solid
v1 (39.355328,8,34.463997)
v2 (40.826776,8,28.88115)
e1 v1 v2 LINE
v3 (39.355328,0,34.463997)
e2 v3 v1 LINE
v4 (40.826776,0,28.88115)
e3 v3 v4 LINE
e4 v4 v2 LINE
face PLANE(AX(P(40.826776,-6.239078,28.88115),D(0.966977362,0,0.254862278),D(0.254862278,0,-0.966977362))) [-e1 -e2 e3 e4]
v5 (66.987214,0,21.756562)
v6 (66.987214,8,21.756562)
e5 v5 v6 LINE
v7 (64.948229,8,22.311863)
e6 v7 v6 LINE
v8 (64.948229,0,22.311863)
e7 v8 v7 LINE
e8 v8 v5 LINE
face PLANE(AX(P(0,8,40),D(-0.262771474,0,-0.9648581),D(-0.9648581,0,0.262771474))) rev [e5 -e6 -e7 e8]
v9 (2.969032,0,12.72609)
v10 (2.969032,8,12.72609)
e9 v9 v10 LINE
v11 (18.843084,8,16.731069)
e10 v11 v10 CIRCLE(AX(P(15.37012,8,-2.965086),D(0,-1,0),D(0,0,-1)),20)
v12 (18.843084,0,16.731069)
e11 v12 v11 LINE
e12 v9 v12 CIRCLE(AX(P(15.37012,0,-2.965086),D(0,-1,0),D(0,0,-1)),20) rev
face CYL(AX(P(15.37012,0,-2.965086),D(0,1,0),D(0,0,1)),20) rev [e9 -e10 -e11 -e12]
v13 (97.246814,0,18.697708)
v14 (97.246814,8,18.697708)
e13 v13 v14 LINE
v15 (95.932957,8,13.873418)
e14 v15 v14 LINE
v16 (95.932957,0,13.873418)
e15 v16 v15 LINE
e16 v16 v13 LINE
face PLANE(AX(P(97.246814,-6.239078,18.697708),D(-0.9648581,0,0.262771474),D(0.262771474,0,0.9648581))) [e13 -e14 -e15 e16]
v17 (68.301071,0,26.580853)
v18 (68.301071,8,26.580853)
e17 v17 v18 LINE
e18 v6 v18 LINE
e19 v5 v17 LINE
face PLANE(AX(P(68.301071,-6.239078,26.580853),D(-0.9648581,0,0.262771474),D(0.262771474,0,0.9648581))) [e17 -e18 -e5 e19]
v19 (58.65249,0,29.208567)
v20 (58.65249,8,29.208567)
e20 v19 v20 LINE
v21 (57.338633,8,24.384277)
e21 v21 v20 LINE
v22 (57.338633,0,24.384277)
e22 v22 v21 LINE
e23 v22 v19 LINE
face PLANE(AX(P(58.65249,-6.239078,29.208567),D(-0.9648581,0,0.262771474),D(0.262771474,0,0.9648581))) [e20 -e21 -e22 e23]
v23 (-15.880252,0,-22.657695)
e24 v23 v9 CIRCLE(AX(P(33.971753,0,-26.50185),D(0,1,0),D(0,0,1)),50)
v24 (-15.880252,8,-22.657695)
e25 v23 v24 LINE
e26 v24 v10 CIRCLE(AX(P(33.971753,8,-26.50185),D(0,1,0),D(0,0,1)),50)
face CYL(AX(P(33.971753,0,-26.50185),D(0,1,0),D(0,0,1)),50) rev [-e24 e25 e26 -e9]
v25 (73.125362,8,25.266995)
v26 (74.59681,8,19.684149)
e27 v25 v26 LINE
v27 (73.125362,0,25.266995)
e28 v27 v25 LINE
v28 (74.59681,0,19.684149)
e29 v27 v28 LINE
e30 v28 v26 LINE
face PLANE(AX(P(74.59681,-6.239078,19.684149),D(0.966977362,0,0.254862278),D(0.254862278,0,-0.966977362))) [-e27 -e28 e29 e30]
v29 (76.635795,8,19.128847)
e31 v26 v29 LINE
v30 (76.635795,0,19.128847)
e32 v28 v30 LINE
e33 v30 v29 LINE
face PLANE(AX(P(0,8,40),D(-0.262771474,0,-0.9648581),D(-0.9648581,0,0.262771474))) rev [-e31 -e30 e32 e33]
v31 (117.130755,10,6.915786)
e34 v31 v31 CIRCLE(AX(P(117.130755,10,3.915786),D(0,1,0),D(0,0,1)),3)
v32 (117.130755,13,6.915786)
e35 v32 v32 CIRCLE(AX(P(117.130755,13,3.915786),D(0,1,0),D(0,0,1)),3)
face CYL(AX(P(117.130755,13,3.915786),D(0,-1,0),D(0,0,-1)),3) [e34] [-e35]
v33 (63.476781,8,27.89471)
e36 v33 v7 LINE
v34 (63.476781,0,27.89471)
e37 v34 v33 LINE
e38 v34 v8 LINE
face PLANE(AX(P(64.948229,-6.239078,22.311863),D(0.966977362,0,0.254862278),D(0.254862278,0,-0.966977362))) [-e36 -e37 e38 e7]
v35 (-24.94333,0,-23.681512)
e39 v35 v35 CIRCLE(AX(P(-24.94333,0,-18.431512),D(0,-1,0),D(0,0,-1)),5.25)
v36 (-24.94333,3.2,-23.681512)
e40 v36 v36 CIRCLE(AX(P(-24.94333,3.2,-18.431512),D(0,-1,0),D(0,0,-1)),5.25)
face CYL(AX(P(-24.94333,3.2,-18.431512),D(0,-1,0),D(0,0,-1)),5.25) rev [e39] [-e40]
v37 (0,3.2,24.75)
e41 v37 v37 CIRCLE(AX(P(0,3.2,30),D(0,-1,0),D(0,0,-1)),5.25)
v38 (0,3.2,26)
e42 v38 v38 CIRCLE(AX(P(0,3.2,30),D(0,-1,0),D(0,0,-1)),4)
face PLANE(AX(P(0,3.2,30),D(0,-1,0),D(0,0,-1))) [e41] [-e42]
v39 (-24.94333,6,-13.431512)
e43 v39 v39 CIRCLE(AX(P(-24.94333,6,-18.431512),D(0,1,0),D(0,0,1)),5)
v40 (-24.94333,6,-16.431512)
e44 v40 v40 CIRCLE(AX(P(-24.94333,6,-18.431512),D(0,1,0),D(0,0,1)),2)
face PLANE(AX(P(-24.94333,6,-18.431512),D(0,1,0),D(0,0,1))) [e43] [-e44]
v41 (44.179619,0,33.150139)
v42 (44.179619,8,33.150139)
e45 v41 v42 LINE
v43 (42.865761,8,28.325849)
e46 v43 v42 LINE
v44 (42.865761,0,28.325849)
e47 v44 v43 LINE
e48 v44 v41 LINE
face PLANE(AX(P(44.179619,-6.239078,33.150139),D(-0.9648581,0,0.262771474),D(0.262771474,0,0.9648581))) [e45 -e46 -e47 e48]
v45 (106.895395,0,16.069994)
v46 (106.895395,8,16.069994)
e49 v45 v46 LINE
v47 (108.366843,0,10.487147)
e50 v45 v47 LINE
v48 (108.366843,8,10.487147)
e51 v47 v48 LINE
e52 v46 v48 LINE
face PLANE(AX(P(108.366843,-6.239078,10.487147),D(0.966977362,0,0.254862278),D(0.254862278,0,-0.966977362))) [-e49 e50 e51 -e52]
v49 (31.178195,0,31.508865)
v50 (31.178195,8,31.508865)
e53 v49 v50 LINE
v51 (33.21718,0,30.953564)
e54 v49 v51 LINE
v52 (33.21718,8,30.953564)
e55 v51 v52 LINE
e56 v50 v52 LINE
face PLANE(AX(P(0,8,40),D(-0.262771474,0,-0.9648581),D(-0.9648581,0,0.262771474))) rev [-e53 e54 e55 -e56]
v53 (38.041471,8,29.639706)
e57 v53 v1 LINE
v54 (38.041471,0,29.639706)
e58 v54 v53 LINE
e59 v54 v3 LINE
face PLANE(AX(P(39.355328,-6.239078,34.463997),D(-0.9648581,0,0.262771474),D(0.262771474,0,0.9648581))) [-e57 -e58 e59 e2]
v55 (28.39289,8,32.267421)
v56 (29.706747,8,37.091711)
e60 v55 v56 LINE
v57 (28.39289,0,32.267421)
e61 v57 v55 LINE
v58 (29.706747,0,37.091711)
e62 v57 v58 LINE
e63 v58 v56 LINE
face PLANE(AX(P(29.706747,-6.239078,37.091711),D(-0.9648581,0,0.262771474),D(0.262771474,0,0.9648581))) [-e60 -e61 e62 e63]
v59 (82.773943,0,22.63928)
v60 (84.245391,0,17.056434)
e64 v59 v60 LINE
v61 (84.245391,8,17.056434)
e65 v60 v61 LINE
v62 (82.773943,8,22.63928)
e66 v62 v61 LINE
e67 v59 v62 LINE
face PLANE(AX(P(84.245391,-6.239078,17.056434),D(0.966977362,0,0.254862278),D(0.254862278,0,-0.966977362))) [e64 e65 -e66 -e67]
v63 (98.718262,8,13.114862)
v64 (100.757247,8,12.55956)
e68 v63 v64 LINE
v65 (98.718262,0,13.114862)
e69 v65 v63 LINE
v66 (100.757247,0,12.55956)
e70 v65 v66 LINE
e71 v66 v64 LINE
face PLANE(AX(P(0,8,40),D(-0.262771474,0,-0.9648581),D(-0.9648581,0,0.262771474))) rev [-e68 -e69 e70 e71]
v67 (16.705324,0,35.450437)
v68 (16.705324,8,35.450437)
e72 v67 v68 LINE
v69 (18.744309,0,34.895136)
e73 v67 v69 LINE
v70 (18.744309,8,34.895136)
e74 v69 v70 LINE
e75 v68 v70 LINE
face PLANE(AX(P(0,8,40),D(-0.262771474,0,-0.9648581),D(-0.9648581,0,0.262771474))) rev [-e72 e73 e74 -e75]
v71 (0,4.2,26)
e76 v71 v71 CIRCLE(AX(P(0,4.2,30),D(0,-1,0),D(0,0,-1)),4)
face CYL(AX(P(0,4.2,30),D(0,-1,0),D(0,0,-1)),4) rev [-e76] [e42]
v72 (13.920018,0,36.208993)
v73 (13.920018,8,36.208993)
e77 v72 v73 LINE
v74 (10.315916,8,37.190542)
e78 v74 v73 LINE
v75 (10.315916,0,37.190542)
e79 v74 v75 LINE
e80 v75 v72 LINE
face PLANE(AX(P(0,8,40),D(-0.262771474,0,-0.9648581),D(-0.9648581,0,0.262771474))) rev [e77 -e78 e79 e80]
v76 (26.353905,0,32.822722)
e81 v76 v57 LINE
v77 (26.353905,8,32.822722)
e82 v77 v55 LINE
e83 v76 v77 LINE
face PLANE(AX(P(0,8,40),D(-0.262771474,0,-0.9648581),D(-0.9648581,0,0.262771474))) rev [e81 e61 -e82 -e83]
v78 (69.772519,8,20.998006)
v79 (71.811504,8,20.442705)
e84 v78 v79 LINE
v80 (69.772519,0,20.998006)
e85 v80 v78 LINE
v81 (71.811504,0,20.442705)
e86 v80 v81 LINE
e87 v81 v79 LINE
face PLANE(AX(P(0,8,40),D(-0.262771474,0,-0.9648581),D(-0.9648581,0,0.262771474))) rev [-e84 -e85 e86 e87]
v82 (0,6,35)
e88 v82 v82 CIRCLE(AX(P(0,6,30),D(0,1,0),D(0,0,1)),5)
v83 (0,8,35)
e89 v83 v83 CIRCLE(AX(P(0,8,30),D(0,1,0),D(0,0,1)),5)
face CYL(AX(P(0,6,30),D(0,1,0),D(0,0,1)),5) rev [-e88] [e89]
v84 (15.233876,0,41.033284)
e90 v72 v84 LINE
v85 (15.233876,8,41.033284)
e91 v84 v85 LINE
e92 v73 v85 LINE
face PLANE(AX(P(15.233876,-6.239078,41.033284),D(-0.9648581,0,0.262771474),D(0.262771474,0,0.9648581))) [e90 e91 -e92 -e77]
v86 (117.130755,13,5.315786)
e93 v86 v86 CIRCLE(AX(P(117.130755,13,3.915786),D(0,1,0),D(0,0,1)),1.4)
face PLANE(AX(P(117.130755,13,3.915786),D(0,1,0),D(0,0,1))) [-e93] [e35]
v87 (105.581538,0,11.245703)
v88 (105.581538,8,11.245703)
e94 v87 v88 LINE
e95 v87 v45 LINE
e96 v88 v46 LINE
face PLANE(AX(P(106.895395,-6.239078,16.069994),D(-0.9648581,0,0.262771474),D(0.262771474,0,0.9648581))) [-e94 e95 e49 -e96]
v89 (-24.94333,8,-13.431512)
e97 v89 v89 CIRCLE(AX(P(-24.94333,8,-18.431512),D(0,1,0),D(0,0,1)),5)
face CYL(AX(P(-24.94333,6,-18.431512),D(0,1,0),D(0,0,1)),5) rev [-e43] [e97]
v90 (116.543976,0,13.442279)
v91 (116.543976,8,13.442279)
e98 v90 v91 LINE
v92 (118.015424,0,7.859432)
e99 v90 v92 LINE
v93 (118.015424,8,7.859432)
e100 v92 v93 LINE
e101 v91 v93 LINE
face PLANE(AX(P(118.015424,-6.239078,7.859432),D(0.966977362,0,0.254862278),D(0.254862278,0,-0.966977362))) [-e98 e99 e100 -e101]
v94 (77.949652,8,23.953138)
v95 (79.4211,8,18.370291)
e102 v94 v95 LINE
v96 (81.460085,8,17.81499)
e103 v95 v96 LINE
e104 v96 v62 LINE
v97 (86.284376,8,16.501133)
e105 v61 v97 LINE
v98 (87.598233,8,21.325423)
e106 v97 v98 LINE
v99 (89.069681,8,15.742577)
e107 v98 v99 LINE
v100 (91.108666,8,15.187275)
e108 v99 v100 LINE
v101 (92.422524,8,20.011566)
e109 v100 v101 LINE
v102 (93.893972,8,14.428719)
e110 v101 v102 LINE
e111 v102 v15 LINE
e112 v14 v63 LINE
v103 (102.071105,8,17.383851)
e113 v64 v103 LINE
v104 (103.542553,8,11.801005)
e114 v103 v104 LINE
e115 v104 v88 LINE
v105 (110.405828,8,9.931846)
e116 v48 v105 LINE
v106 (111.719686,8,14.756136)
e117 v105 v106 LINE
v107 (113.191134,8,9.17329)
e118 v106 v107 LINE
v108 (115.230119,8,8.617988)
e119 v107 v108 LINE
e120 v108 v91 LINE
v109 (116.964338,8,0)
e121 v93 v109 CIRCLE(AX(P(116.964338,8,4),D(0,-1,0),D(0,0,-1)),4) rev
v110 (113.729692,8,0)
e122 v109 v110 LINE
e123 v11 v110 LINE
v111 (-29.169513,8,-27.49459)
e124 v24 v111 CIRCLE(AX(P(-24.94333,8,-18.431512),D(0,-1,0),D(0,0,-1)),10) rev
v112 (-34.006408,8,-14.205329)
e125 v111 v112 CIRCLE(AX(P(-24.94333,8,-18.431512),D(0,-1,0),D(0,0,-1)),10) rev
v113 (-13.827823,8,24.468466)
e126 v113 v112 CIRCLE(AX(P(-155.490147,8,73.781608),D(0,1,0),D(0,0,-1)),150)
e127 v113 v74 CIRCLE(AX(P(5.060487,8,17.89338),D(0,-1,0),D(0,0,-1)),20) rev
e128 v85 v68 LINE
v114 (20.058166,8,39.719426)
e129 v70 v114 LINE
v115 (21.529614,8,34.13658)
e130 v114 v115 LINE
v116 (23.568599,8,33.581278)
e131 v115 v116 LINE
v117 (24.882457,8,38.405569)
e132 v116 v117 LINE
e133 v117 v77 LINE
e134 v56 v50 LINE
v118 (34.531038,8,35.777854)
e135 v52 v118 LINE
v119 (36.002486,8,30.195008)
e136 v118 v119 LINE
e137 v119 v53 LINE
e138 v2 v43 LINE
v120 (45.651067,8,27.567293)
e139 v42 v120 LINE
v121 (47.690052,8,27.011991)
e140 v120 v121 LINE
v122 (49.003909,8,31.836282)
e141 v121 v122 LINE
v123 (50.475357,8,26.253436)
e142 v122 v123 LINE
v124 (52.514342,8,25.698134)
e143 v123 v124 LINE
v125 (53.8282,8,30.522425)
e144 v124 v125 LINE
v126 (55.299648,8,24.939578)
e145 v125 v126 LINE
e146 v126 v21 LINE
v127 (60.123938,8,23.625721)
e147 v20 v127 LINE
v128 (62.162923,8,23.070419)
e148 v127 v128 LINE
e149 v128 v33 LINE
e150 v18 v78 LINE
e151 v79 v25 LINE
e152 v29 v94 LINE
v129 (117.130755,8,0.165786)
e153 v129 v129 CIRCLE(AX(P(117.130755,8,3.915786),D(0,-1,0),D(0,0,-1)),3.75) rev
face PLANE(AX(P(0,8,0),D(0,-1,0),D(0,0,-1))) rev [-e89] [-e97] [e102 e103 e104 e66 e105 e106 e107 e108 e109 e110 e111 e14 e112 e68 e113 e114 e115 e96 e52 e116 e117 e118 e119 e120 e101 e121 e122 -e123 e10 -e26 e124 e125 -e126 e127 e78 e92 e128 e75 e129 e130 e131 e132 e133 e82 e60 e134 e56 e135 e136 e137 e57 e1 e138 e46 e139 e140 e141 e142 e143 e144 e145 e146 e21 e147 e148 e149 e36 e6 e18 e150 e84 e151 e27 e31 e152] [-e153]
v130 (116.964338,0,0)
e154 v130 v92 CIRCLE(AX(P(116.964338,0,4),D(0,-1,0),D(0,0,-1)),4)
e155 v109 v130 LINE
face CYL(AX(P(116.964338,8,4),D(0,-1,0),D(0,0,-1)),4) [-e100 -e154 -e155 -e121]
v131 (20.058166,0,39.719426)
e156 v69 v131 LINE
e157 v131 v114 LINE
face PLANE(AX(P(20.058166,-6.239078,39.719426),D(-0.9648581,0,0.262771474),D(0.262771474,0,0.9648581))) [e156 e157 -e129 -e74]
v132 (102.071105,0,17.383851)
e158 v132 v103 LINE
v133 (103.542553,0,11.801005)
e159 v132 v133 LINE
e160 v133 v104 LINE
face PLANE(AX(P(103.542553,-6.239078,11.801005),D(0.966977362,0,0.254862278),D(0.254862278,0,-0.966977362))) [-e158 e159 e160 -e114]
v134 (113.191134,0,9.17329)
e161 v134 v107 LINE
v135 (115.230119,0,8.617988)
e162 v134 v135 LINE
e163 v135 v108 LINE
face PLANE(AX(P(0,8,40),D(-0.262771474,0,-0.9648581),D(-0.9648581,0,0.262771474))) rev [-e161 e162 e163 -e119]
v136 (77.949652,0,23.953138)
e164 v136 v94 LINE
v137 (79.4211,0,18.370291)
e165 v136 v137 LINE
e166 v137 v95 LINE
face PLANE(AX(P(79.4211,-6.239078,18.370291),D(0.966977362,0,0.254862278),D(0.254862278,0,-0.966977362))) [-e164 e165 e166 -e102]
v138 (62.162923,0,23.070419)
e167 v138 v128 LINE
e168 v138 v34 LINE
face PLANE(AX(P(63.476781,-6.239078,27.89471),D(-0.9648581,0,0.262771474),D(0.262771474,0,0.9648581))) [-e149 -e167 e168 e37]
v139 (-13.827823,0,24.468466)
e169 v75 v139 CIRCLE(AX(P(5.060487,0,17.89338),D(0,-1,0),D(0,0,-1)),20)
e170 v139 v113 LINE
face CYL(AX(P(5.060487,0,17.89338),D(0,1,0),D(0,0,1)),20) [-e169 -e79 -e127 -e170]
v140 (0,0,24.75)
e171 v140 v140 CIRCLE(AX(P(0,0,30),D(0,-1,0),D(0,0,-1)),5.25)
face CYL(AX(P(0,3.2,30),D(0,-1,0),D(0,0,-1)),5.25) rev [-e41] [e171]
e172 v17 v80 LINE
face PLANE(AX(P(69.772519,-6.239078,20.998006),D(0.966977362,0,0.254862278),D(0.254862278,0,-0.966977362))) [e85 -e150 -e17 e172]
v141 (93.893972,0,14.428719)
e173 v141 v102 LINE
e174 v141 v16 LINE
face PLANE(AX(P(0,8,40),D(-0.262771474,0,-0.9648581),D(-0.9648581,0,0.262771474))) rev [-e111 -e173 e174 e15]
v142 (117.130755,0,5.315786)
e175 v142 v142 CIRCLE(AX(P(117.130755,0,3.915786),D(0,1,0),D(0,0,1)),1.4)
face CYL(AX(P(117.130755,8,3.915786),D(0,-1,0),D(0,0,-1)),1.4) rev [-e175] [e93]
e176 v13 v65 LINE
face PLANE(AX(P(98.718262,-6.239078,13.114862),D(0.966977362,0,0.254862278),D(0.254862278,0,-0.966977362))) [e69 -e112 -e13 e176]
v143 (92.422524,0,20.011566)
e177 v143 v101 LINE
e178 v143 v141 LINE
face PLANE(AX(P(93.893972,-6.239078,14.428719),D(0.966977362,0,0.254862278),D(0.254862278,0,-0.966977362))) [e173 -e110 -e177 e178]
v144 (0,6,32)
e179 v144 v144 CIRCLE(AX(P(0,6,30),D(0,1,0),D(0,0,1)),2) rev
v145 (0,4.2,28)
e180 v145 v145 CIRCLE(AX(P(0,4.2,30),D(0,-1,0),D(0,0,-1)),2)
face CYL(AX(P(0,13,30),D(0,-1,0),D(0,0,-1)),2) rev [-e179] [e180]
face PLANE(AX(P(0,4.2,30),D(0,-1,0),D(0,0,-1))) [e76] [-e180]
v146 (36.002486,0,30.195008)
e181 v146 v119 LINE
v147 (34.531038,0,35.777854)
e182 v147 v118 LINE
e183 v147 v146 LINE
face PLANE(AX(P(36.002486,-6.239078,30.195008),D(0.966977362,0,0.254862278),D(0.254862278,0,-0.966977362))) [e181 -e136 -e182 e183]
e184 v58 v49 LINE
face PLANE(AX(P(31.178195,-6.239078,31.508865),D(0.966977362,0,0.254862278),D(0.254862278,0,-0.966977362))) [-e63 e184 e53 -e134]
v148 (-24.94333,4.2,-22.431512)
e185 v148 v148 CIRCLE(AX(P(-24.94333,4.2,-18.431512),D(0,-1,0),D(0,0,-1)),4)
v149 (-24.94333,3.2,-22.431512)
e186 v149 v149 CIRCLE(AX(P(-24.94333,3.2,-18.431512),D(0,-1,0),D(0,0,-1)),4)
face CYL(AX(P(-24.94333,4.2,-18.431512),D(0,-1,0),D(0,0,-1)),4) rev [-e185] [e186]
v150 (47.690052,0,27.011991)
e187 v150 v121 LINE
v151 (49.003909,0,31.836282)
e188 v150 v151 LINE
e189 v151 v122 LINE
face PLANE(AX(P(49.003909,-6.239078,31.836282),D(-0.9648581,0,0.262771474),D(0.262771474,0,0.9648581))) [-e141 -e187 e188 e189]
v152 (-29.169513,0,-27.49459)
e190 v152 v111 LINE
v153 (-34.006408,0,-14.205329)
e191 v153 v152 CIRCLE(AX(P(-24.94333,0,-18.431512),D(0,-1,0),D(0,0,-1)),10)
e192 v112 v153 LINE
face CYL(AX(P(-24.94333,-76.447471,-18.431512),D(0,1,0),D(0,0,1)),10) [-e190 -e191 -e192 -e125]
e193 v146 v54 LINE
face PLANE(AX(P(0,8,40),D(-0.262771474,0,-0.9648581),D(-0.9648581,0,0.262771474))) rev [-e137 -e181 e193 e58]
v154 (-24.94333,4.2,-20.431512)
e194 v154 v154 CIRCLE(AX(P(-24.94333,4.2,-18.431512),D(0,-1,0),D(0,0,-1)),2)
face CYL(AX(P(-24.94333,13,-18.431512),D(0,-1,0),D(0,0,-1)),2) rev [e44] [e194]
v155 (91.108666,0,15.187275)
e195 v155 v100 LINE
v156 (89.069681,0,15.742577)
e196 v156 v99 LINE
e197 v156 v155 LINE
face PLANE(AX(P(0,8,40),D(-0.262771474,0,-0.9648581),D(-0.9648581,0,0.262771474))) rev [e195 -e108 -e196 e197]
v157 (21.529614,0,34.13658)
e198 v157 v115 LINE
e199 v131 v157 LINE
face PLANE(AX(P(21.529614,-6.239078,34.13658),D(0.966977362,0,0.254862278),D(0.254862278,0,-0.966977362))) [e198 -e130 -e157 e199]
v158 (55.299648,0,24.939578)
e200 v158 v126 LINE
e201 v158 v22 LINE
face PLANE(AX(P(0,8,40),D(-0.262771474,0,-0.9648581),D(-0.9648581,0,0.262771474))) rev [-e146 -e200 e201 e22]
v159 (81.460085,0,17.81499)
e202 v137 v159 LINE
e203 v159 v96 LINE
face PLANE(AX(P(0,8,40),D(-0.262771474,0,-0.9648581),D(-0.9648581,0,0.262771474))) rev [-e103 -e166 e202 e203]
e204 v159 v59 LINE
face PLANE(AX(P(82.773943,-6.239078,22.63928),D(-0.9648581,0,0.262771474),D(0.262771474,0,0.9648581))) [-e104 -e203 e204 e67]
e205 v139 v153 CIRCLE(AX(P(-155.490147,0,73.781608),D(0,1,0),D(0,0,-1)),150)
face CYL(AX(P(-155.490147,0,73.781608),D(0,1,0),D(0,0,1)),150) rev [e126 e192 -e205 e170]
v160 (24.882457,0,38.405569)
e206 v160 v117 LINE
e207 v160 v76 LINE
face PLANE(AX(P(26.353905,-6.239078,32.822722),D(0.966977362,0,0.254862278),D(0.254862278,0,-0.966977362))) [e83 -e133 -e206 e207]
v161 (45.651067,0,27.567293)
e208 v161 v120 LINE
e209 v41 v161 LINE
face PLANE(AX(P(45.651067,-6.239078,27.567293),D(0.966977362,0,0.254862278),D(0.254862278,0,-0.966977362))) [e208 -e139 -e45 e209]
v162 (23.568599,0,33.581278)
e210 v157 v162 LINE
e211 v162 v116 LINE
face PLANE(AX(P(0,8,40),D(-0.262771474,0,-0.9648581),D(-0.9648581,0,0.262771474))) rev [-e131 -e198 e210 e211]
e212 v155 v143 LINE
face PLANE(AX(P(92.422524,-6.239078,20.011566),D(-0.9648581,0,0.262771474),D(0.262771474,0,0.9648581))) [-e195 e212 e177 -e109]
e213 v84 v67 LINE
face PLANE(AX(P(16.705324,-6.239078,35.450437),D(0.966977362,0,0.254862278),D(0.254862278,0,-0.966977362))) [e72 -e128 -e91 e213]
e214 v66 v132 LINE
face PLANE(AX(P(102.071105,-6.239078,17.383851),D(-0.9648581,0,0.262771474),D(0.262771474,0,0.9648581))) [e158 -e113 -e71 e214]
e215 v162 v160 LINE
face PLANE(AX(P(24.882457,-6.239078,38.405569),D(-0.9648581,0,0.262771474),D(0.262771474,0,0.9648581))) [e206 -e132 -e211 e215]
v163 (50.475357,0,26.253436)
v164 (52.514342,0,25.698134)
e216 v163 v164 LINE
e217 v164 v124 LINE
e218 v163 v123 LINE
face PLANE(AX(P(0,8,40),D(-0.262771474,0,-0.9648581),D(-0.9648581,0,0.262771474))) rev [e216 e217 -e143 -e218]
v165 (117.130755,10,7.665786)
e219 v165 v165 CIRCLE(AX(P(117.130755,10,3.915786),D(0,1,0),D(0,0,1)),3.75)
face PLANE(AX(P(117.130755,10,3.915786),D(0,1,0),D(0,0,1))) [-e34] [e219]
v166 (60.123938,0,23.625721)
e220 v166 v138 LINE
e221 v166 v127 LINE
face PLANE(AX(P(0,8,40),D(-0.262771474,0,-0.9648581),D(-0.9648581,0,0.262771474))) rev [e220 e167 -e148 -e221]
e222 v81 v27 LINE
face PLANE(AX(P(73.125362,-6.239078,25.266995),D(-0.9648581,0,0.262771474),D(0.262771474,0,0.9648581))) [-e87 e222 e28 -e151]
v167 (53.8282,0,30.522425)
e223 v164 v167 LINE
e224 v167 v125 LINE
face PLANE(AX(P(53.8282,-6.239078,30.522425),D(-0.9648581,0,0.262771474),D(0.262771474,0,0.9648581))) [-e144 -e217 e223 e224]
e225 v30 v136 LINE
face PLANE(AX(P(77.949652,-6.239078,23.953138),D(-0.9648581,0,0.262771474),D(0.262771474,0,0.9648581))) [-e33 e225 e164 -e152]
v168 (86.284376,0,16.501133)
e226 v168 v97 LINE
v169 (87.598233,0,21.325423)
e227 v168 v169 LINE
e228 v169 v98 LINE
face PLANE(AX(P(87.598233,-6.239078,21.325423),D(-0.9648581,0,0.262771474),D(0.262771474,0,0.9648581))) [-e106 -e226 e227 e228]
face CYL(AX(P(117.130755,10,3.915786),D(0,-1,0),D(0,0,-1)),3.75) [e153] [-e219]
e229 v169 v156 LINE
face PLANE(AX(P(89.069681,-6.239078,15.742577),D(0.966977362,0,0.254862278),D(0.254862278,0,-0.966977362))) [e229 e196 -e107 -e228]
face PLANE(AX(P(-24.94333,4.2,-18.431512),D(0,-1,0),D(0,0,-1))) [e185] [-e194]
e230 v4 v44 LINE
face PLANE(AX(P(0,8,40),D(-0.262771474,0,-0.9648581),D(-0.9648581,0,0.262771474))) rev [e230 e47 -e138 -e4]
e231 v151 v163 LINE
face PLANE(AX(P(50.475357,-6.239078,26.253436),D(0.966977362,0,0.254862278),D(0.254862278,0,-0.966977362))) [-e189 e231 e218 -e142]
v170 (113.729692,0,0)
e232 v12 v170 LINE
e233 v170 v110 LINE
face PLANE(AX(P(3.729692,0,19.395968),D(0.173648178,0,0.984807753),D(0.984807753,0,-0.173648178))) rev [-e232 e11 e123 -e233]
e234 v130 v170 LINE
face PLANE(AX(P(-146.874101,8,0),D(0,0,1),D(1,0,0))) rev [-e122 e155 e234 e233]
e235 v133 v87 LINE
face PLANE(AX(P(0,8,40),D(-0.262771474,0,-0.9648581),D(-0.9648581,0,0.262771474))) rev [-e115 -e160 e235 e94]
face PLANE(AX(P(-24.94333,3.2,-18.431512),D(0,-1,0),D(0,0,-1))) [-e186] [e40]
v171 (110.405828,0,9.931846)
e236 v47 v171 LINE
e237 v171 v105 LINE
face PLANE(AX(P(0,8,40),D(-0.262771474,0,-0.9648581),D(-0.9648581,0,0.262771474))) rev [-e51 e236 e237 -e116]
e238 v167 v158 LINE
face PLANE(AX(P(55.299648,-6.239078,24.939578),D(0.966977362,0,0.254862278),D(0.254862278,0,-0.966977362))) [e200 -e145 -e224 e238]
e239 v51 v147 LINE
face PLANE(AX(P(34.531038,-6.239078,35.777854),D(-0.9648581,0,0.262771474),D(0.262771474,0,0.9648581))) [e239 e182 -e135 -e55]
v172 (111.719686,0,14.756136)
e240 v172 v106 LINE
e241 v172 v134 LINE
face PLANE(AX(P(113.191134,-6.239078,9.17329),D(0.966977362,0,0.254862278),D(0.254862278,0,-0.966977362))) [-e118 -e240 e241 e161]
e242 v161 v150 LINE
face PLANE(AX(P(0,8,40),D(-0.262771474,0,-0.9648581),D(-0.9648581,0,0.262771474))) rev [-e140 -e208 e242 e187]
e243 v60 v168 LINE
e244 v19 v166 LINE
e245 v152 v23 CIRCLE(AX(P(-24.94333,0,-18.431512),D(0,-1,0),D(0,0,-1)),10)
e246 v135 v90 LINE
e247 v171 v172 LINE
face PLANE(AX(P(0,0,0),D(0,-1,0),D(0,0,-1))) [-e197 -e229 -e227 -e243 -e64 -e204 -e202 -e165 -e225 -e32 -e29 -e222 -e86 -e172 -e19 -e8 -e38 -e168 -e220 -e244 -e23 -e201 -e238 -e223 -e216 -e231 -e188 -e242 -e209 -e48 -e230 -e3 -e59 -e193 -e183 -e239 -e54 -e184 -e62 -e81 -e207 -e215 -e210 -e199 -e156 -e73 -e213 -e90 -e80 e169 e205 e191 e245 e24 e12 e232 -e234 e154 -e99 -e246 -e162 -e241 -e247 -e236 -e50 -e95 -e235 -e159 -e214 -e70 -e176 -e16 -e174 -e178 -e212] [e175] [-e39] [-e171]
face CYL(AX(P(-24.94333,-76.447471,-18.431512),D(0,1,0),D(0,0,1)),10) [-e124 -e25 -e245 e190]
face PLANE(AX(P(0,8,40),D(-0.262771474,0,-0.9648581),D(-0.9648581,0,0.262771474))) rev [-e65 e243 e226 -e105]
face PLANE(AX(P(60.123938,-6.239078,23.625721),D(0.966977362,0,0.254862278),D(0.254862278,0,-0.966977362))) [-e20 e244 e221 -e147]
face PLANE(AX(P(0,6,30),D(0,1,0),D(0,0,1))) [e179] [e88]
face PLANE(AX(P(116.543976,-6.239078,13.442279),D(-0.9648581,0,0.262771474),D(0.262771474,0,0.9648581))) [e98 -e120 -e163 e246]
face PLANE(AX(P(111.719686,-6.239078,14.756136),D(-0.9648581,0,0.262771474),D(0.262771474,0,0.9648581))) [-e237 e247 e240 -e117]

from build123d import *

# Parameters (mm, degrees)
SKETCH1_R                = 1.4
BOSS_EXTRUDE1_DEPTH      = 8
SKETCH2_R                = 3.75
BOSS_EXTRUDE2_DEPTH      = 2
SKETCH3_R                = 3
BOSS_EXTRUDE3_DEPTH      = 3
CUT_EXTRUDE1_DEPTH       = 153.777621068
CUT_EXTRUDE1_DEPTH_BACK  = 153.777621068
SKETCH4_R                = 1.4
FILLET1_R                = 4
SKETCH5_R                = 5.1
CUT_EXTRUDE2_DEPTH       = 3.2
SKETCH6_R                = 4
CUT_EXTRUDE3_DEPTH       = 1
SKETCH7_R                = 5
CUT_EXTRUDE4_DEPTH       = 2
CUT_EXTRUDE5_DEPTH       = 128.709870942
CUT_EXTRUDE5_DEPTH_BACK  = 128.709870942
SKETCH8_R                = 2
SKETCH9_W                = 150
SKETCH9_H                = 50
CUT_EXTRUDE6_DEPTH       = 128.657240829
BOSS_EXTRUDE4_DEPTH      = 8
FILLET2_R                = 10
SKETCH11_R               = 5.25
CUT_EXTRUDE7_DEPTH       = 3.2
SKETCH12_R               = 4
CUT_EXTRUDE8_DEPTH       = 1
SKETCH13_R               = 5
CUT_EXTRUDE9_DEPTH       = 2
CUT_EXTRUDE10_DEPTH      = 128.709870942
CUT_EXTRUDE10_DEPTH_BACK = 128.709870942
SKETCH14_R               = 2
CUT_EXTRUDE11_DEPTH      = 128.657240829
CUT_EXTRUDE11_DEPTH_BACK = 128.657240829
FILLET3_R                = 20
CUT_EXTRUDE12_DEPTH      = 128.657240829
CUT_EXTRUDE12_DEPTH_BACK = 128.657240829
FILLET4_R                = 20
FILLET5_R                = 20
BOSS_EXTRUDE5_DEPTH      = 8
LPATTERN1_COUNT          = 22
LPATTERN1_PITCH          = 5
SKETCH19_R               = 5.25
CUT_EXTRUDE13_DEPTH      = 3.2
SKETCH20_R               = 4
CUT_EXTRUDE14_DEPTH      = 1
CUT_EXTRUDE15_DEPTH      = 129.03726605
CUT_EXTRUDE15_DEPTH_BACK = 129.03726605
SKETCH21_R               = 2
SKETCH22_R               = 5
CUT_EXTRUDE16_DEPTH      = 2


# Some blends are built 0.0001 mm under size
with BuildPart() as part:
    # Sketch1 → Boss-Extrude1 (new body)
    with BuildSketch(Plane(origin=(0, 0, 0), x_dir=(1, 0, 0), z_dir=(0, 1, 0))):
        Polygon((-146.874100845, 0), (146.874100845, 0), (0, -40), align=None)
        with Locations(Location((-117.130755004, -3.915785767, 0), (0, 0, 270))):
            Circle(SKETCH1_R, mode=Mode.SUBTRACT)
        with Locations(Location((0, -30, 0), (0, 0, 270))):
            Circle(SKETCH1_R, mode=Mode.SUBTRACT)
        with Locations(Location((117.130755004, -3.915785767, 0), (0, 0, 270))):
            Circle(SKETCH1_R, mode=Mode.SUBTRACT)
    extrude(amount=BOSS_EXTRUDE1_DEPTH)

    # Sketch2 → Boss-Extrude2 (add)
    with BuildSketch(Plane(origin=(0, 8, 0), x_dir=(1, 0, 0), z_dir=(0, 1, 0))):
        with Locations(Location((117.130755004, -3.915785767, 0), (0, 0, 90))):
            Circle(SKETCH2_R)
    extrude(amount=BOSS_EXTRUDE2_DEPTH)

    # Sketch3 → Boss-Extrude3 (add)
    with BuildSketch(Plane(origin=(0, 10, 0), x_dir=(1, 0, 0), z_dir=(0, 1, 0))):
        with Locations(Location((117.130755004, -3.915785767, 0), (0, 0, 270))):
            Circle(SKETCH3_R)
    extrude(amount=BOSS_EXTRUDE3_DEPTH)

    # Sketch4 → Cut-Extrude1 (cut, two sides: drawn at the far end of the back side and taken through both)
    with BuildSketch(Plane(origin=(0, 13, 0), x_dir=(1, 0, 0), z_dir=(0, 1, 0)).offset(-CUT_EXTRUDE1_DEPTH_BACK)):
        with Locations(Location((117.130755004, -3.915785767, 0), (0, 0, 270))):
            Circle(SKETCH4_R)
    extrude(amount=CUT_EXTRUDE1_DEPTH + CUT_EXTRUDE1_DEPTH_BACK, mode=Mode.SUBTRACT)

    # Fillet1
    fillet1_edges = [part.edges().sort_by_distance(p)[0] for p in [
        (-146.874100845, 4, 0),
        (146.874100845, 4, 0),
    ]]
    fillet(fillet1_edges, radius=FILLET1_R)

    # Sketch5 → Cut-Extrude2 (cut)
    with BuildSketch(Plane.XZ):
        with Locations((-117.130755004, 3.915785767)):
            Circle(SKETCH5_R)
    extrude(amount=-CUT_EXTRUDE2_DEPTH, mode=Mode.SUBTRACT)

    # Sketch6 → Cut-Extrude3 (cut)
    with BuildSketch(Plane.XZ.offset(-3.2)):
        with Locations((-117.130755004, 3.915785767)):
            Circle(SKETCH6_R)
    extrude(amount=-CUT_EXTRUDE3_DEPTH, mode=Mode.SUBTRACT)

    # Sketch7 → Cut-Extrude4 (cut)
    with BuildSketch(Plane(origin=(0, 8, 0), x_dir=(1, 0, 0), z_dir=(0, 1, 0))):
        with Locations((-117.130755004, -3.915785767)):
            Circle(SKETCH7_R)
    extrude(amount=-CUT_EXTRUDE4_DEPTH, mode=Mode.SUBTRACT)

    # Sketch8 → Cut-Extrude5 (cut, two sides: drawn at the far end of the back side and taken through both)
    with BuildSketch(Plane.XZ.offset(-4.2).offset(-CUT_EXTRUDE5_DEPTH_BACK)):
        with Locations(Location((-117.130755004, 3.915785767, 0), (0, 0, 270))):
            Circle(SKETCH8_R)
    extrude(amount=CUT_EXTRUDE5_DEPTH + CUT_EXTRUDE5_DEPTH_BACK, mode=Mode.SUBTRACT)

    # Sketch9 → Cut-Extrude6 (cut, through all)
    with BuildSketch(Plane(origin=(0, 8, 0), x_dir=(1, 0, 0), z_dir=(0, 1, 0))):
        with Locations((-85, -25)):
            Rectangle(SKETCH9_W, SKETCH9_H)
    extrude(amount=-CUT_EXTRUDE6_DEPTH, mode=Mode.SUBTRACT)

    # Sketch10 → Boss-Extrude4 (add)
    with BuildSketch(Plane(origin=(0, 8, 0), x_dir=(1, 0, 0), z_dir=(0, 1, 0))):
        Polygon((-10, -37.276579072), (-38.232590814, 23.268407311), (-20.106435073, 31.720772546), (-5.314795912, 0), (-10, 0), align=None)
    extrude(amount=-BOSS_EXTRUDE4_DEPTH)

    # Fillet2
    fillet2_edges = [part.edges().sort_by_distance(p)[0] for p in [
        (-20.106435073, 4, -31.720772546),
        (-38.232590814, 4, -23.268407311),
    ]]
    fillet(fillet2_edges, radius=FILLET2_R - 0.0001)  # a hair under: the kernel refuses the full size

    # Sketch11 → Cut-Extrude7 (cut)
    with BuildSketch(Plane.XZ):
        with Locations(Location((-24.943330326, -18.431512059, 0), (0, 0, 270))):
            Circle(SKETCH11_R)
    extrude(amount=-CUT_EXTRUDE7_DEPTH, mode=Mode.SUBTRACT)

    # Sketch12 → Cut-Extrude8 (cut)
    with BuildSketch(Plane.XZ.offset(-3.2)):
        with Locations(Location((-24.943330326, -18.431512059, 0), (0, 0, 270))):
            Circle(SKETCH12_R)
    extrude(amount=-CUT_EXTRUDE8_DEPTH, mode=Mode.SUBTRACT)

    # Sketch13 → Cut-Extrude9 (cut)
    with BuildSketch(Plane(origin=(0, 8, 0), x_dir=(1, 0, 0), z_dir=(0, 1, 0))):
        with Locations(Location((-24.943330326, 18.431512059, 0), (0, 0, 270))):
            Circle(SKETCH13_R)
    extrude(amount=-CUT_EXTRUDE9_DEPTH, mode=Mode.SUBTRACT)

    # Sketch14 → Cut-Extrude10 (cut, two sides: drawn at the far end of the back side and taken through both)
    with BuildSketch(Plane.XZ.offset(-4.2).offset(-CUT_EXTRUDE10_DEPTH_BACK)):
        with Locations(Location((-24.943330326, -18.431512059, 0), (0, 0, 270))):
            Circle(SKETCH14_R)
    extrude(amount=CUT_EXTRUDE10_DEPTH + CUT_EXTRUDE10_DEPTH_BACK, mode=Mode.SUBTRACT)

    # Sketch16 → Cut-Extrude11 (cut, two sides: drawn at the far end of the back side and taken through both)
    with BuildSketch(Plane(origin=(0, 8, 0), x_dir=(1, 0, 0), z_dir=(0, 1, 0)).offset(-CUT_EXTRUDE11_DEPTH_BACK)):
        Polygon((-5.314795912, 0), (3.729692447, -19.395967878), (113.729692447, 0), align=None)
    extrude(amount=CUT_EXTRUDE11_DEPTH + CUT_EXTRUDE11_DEPTH_BACK, mode=Mode.SUBTRACT)

    # Fillet3
    fillet3_edges = [part.edges().sort_by_distance(p)[0] for p in [
        (3.729692447, 4, 19.395967878),
    ]]
    fillet(fillet3_edges, radius=FILLET3_R)

    # Sketch17 → Cut-Extrude12 (cut, two sides: drawn at the far end of the back side and taken through both)
    with BuildSketch(Plane(origin=(0, 8, 0), x_dir=(1, 0, 0), z_dir=(0, 1, 0)).offset(-CUT_EXTRUDE12_DEPTH_BACK)):
        with BuildLine():
            Line((-34.006408196, 14.205329441), (-10, -37.276579072))
            ThreePointArc((-10, -37.276579072), (-19.543978786, -10.388869219), (-34.006408196, 14.205329441))
        make_face()
        with BuildLine():
            Line((-15.880252455, 22.657694676), (2.969031552, -12.726090006))
            ThreePointArc((2.969031552, -12.726090006), (-10.157316426, 2.993867794), (-15.880252455, 22.657694676))
        make_face()
    extrude(amount=CUT_EXTRUDE12_DEPTH + CUT_EXTRUDE12_DEPTH_BACK, mode=Mode.SUBTRACT)

    # Fillet4
    # the kernel refuses this fillet: 20 mm, written as the material it takes off along each edge
    with BuildSketch(Plane(origin=(-10, -26.307947418, 37.276579072), x_dir=(-0.2772397367749404, 0, -0.9608007745380734), z_dir=(0, 1, 0))) as fillet4_piece_1:
        with BuildLine():
            CenterArc((11.224724232, -19.987692069), FILLET4_R, 92.010191512, 54.159422267)
            Line((-5.389062305, -8.852967244), (-5.721338035, -8.630272748))
            ThreePointArc((-5.721338035, -8.630272748), (-3.036205438, -4.218496406), (-0.341674286, 0.207987217))
            Line((-0.341674286, 0.207987217), (0.014030905, 0.399753841))
            ThreePointArc((0.014030905, 0.399753841), (5.261589484, 0.307690517), (10.509148062, 0.399753841))
            Line((10.509148062, 0.399753841), (10.523178967, 0))
        make_face()
    extrude(amount=60.615894837, mode=Mode.SUBTRACT)

    # Fillet5
    # the kernel refuses this fillet: 20 mm, written as the material it takes off along each edge
    with BuildSketch(Plane(origin=(0, -51.987814503, 40), x_dir=(-0.6649550163020994, 0, -0.746883408769183), z_dir=(0, 1, 0))) as fillet5_piece_1:
        with BuildLine():
            CenterArc((13.146071877, -18.479501456), FILLET5_R, 67.51430871, 86.041392207)
            Line((-4.761282448, -9.572949875), (-6.552017881, -8.682294717))
            Line((-6.552017881, -8.682294717), (-1.790735433, 0.890655158))
            Line((-1.790735433, 0.890655158), (-1.017670329, 1.721727941))
            ThreePointArc((-1.017670329, 1.721727941), (18.974933836, 2.946825813), (21.560031193, 1.847950146))
            Line((21.560031193, 1.847950146), (20.795125801, 0))
        make_face()
    extrude(amount=111.975629005, mode=Mode.SUBTRACT)

    # Sketch18 → Boss-Extrude5 (add)
    with BuildSketch(Plane(origin=(0, 8, 0), x_dir=(1, 0, 0), z_dir=(0, 1, 0))):
        Polygon((118.015424178, -7.859432398), (116.543976131, -13.442278803), (115.230118761, -8.617988305), align=None)
    boss_extrude5 = extrude(amount=-BOSS_EXTRUDE5_DEPTH)

    # LPattern1: Boss-Extrude5 ×22
    with Locations(*[Vector(-0.9648580996210196, 0, 0.26277147409053875) * (i * LPATTERN1_PITCH) for i in range(1, LPATTERN1_COUNT)]):
        add(boss_extrude5)

    # Sketch19 → Cut-Extrude13 (cut)
    with BuildSketch(Plane.XZ):
        with Locations(Location((0, 30, 0), (0, 0, 270))):
            Circle(SKETCH19_R)
    extrude(amount=-CUT_EXTRUDE13_DEPTH, mode=Mode.SUBTRACT)

    # Sketch20 → Cut-Extrude14 (cut)
    with BuildSketch(Plane.XZ.offset(-3.2)):
        with Locations(Location((0, 30, 0), (0, 0, 270))):
            Circle(SKETCH20_R)
    extrude(amount=-CUT_EXTRUDE14_DEPTH, mode=Mode.SUBTRACT)

    # Sketch21 → Cut-Extrude15 (cut, two sides: drawn at the far end of the back side and taken through both)
    with BuildSketch(Plane.XZ.offset(-4.2).offset(-CUT_EXTRUDE15_DEPTH_BACK)):
        with Locations(Location((0, 30, 0), (0, 0, 270))):
            Circle(SKETCH21_R)
    extrude(amount=CUT_EXTRUDE15_DEPTH + CUT_EXTRUDE15_DEPTH_BACK, mode=Mode.SUBTRACT)

    # Sketch22 → Cut-Extrude16 (cut)
    with BuildSketch(Plane(origin=(0, 8, 0), x_dir=(1, 0, 0), z_dir=(0, 1, 0))):
        with Locations(Location((0, -30, 0), (0, 0, 270))):
            Circle(SKETCH22_R)
    extrude(amount=-CUT_EXTRUDE16_DEPTH, mode=Mode.SUBTRACT)


solid = part.part
